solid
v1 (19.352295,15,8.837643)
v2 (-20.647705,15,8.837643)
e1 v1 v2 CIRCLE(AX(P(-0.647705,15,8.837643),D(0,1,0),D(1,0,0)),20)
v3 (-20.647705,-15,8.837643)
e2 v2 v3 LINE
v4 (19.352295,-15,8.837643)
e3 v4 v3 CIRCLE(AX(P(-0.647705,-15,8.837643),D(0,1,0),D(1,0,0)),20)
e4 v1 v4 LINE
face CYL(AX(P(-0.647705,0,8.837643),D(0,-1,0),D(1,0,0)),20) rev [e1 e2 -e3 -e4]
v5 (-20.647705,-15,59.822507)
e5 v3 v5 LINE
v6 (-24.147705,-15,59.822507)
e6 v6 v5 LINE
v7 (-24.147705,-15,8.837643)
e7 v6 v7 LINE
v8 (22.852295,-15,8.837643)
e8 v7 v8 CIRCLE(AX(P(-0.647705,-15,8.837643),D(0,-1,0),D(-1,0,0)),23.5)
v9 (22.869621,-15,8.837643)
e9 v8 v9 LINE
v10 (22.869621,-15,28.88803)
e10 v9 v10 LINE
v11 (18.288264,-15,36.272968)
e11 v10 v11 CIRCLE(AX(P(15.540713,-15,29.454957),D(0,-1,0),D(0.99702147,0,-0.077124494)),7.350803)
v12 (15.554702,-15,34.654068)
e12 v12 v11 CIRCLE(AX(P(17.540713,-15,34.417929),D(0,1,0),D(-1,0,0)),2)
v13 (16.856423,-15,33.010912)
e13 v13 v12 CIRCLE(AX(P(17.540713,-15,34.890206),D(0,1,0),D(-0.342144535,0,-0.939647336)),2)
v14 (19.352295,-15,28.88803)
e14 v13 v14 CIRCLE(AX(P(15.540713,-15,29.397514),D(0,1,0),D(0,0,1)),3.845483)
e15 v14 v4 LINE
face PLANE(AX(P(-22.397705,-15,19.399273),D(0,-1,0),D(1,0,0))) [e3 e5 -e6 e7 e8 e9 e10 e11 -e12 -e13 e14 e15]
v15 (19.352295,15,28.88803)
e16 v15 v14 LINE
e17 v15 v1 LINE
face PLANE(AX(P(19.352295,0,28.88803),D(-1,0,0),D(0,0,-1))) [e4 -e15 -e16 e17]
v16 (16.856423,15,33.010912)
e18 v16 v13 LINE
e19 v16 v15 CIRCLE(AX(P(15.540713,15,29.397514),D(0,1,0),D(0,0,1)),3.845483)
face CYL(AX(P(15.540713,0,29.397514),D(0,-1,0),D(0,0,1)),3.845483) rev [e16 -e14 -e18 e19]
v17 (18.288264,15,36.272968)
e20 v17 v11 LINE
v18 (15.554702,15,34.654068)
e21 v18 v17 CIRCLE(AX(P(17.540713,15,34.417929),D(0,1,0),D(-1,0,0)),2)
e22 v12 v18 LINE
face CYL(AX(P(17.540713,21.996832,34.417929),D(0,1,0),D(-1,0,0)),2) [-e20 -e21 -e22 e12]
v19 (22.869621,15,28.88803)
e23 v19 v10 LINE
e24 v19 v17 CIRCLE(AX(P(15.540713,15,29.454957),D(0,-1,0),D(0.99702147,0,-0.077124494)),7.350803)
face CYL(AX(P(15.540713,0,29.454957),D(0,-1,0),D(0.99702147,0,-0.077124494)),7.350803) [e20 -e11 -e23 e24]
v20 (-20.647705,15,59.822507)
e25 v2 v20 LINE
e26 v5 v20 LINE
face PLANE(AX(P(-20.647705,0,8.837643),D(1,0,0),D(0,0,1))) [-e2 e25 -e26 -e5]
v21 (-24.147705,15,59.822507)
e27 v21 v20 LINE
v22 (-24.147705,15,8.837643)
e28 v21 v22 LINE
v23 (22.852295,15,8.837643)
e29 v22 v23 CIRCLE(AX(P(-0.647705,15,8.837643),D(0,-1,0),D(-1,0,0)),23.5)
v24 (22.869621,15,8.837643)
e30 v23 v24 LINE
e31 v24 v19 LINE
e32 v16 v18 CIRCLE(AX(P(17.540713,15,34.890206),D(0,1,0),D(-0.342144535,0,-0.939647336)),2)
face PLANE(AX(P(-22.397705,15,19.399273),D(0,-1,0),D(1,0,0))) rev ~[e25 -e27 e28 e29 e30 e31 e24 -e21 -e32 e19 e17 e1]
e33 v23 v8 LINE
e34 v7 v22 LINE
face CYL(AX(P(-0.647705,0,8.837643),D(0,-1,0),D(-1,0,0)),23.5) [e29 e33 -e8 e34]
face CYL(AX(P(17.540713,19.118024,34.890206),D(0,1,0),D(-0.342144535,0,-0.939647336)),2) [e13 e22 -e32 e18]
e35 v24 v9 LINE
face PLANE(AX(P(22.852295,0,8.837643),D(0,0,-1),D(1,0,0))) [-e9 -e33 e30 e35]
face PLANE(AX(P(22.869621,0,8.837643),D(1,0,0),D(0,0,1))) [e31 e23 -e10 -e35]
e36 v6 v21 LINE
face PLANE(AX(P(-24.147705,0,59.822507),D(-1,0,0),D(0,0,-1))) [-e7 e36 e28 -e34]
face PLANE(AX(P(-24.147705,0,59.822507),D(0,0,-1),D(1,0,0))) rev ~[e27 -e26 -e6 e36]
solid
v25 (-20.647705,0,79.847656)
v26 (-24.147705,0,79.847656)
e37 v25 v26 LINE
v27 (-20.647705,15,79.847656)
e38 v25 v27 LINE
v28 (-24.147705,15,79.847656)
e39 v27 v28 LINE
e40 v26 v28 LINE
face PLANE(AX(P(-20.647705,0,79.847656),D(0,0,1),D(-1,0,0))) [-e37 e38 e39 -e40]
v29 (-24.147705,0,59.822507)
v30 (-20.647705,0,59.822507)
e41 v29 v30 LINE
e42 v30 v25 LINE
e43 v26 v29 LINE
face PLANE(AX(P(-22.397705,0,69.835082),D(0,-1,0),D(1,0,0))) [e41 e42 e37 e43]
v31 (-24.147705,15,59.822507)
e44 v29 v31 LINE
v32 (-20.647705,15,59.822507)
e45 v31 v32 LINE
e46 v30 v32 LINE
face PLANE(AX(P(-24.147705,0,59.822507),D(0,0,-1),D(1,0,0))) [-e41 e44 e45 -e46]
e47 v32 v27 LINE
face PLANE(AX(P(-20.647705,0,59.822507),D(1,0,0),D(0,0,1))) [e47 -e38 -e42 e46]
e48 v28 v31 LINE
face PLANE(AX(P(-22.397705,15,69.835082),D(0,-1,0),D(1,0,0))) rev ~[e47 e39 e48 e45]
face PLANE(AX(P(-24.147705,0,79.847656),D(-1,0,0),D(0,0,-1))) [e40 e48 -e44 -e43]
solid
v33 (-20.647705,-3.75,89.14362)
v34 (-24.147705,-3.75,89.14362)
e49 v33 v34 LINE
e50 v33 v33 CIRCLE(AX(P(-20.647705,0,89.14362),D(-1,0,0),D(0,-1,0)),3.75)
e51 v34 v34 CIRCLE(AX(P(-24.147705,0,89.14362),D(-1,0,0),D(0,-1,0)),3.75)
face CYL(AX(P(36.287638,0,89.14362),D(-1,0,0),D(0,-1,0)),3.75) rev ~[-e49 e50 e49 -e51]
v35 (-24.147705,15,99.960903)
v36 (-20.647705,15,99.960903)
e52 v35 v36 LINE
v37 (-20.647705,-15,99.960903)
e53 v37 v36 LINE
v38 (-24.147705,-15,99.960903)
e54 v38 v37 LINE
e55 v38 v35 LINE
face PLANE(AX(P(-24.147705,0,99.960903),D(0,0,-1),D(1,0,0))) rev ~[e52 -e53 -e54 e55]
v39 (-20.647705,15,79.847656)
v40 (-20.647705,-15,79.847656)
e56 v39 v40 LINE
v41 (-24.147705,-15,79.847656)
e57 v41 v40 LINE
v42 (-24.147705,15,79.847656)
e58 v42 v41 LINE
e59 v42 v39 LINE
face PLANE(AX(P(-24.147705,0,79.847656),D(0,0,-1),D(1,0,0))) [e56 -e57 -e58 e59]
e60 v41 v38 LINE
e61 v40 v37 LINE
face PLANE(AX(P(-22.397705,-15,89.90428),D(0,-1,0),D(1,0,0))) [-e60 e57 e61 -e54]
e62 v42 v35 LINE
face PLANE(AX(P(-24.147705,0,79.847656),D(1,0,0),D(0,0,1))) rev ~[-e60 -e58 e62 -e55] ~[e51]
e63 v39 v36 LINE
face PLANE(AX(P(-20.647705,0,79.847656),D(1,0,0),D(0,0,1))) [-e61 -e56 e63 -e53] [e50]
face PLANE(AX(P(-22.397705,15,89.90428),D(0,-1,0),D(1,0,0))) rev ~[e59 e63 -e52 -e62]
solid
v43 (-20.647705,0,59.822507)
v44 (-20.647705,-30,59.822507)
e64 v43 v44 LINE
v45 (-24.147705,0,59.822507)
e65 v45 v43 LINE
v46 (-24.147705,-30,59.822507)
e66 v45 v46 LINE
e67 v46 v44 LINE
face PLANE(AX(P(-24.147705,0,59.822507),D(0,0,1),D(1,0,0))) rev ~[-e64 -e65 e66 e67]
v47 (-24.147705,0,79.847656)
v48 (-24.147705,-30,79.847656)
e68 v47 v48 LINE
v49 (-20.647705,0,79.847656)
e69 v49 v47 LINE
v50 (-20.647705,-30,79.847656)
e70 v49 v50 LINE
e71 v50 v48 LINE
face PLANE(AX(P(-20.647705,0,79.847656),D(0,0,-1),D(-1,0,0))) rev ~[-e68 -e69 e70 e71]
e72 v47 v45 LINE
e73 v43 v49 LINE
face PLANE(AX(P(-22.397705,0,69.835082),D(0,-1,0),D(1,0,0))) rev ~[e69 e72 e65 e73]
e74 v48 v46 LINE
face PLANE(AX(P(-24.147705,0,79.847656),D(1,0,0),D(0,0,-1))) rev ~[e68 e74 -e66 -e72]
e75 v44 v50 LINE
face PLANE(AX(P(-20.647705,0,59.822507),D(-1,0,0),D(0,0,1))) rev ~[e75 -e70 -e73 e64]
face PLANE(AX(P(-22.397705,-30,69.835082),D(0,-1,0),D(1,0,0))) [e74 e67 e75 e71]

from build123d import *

# Parameters (mm, degrees)
F0_W        = 3.5
F0_H        = 20.1132470577
F1_DEPTH    = 15
F0_H_2      = 21.1232600108
F0_H_3      = 29.8616039545
F3_D        = 7.5
F4_T1_DEPTH = 38.2360477135
F4_T3_DEPTH = 43.9936648007
F5_DEPTH    = 30
F6_DEPTH    = 15


# Not quite as in the source:
# - a fillet or chamfer that OpenCascade refuses, or shapes differently, is made with other operations: its cross-section is extruded or revolved along the edge and cut away or added


with BuildPart() as f1:
    # F0 (on Front) → F1 (new body, symmetric)
    with BuildSketch(Plane.XZ):
        with Locations((-22.3977046013, 89.9042797192)):
            Rectangle(F0_W, F0_H)
    extrude(amount=F1_DEPTH, both=True)

    # F3 (through all)
    with Locations(Plane.YZ):
        with Locations((0, 89.1436196168)):
            Hole(F3_D / 2)


with BuildPart() as f1b:
    # F0 (on Front) → F1, piece 2 (new body, symmetric)
    with BuildSketch(Plane.XZ):
        with Locations((-22.3977046013, 19.3992732427)):
            Rectangle(F0_W, F0_H_2)
        with BuildLine():
            Line((-20.6477046013, 8.8376432372), (-24.1477046013, 8.8376432372))
            ThreePointArc((-24.1477046013, 8.8376432372), (-0.6477046013, -14.6623567628), (22.8522953987, 8.8376432372))
            Line((22.8522953987, 8.8376432372), (19.3522953987, 8.8376432372))
            ThreePointArc((19.3522953987, 8.8376432372), (-0.6477046013, -11.1623567628), (-20.6477046013, 8.8376432372))
        make_face()
        Polygon((19.3522953987, 8.8376432372), (22.8522953987, 8.8376432372), (22.8696210889, 8.8376432372), (22.8696210889, 28.8880299777), (19.3522953987, 28.8880299777), align=None)
        with BuildLine():
            ThreePointArc((15.540712513, 33.2429967821), (18.4344082452, 31.930153514), (19.3522953987, 28.8880299777))
            Line((19.3522953987, 28.8880299777), (22.8696210889, 28.8880299777))
            ThreePointArc((22.8696210889, 28.8880299777), (20.9352317559, 34.4482994471), (15.540712513, 36.8057601154))
            Line((15.540712513, 36.8057601154), (15.540712513, 33.2429967821))
        make_face()
        with Locations((-22.3977046013, 44.8917052254)):
            Rectangle(F0_W, F0_H_3)
    extrude(amount=F1_DEPTH, both=True)

    # F4: fillet of radius 2 on 2 edges, made by hand

    # F4_s2 → F4_t1 (cut)
    with BuildSketch(Plane.XZ.offset(-19.1180238568)):
        with BuildLine():
            ThreePointArc((16.8564234422, 33.0109116519), (15.9023324989, 33.7431618927), (15.540712513, 34.8902063248))
            Line((15.540712513, 34.8902063248), (15.540712513, 33.2429967821))
            ThreePointArc((15.540712513, 33.2429967821), (16.2087242563, 33.1845310505), (16.8564234422, 33.0109116519))
        make_face()
    extrude(amount=F4_T1_DEPTH, mode=Mode.SUBTRACT)

    # F4_s4 → F4_t3 (cut)
    with BuildSketch(Plane.XZ.offset(-21.9968324004)):
        with BuildLine():
            ThreePointArc((15.540712513, 34.4179292964), (16.4215839799, 36.0755032243), (18.2882638394, 36.2729675749))
            ThreePointArc((18.2882638394, 36.2729675749), (16.9400789931, 36.6713328153), (15.540712513, 36.8057601154))
            Line((15.540712513, 36.8057601154), (15.540712513, 34.4179292964))
        make_face()
    extrude(amount=F4_T3_DEPTH, mode=Mode.SUBTRACT)


with BuildPart() as f5:
    # F0 (on Front) → F5 (new body)
    with BuildSketch(Plane.XZ):
        Polygon((-20.6477046013, 79.8476561904), (-24.1477046013, 79.8476561904), (-24.1477046013, 59.8225072026), (-20.6477046013, 59.8225072026), (-20.6477046013, 65.9805735738), align=None)
    extrude(amount=F5_DEPTH)


with BuildPart() as f6:
    # F0 (on Front) → F6 (new body)
    with BuildSketch(Plane.XZ):
        Polygon((-20.6477046013, 79.8476561904), (-24.1477046013, 79.8476561904), (-24.1477046013, 59.8225072026), (-20.6477046013, 59.8225072026), (-20.6477046013, 65.9805735738), align=None)
    extrude(amount=-F6_DEPTH)


solid = Compound([f1.part, f1b.part, f5.part, f6.part])
